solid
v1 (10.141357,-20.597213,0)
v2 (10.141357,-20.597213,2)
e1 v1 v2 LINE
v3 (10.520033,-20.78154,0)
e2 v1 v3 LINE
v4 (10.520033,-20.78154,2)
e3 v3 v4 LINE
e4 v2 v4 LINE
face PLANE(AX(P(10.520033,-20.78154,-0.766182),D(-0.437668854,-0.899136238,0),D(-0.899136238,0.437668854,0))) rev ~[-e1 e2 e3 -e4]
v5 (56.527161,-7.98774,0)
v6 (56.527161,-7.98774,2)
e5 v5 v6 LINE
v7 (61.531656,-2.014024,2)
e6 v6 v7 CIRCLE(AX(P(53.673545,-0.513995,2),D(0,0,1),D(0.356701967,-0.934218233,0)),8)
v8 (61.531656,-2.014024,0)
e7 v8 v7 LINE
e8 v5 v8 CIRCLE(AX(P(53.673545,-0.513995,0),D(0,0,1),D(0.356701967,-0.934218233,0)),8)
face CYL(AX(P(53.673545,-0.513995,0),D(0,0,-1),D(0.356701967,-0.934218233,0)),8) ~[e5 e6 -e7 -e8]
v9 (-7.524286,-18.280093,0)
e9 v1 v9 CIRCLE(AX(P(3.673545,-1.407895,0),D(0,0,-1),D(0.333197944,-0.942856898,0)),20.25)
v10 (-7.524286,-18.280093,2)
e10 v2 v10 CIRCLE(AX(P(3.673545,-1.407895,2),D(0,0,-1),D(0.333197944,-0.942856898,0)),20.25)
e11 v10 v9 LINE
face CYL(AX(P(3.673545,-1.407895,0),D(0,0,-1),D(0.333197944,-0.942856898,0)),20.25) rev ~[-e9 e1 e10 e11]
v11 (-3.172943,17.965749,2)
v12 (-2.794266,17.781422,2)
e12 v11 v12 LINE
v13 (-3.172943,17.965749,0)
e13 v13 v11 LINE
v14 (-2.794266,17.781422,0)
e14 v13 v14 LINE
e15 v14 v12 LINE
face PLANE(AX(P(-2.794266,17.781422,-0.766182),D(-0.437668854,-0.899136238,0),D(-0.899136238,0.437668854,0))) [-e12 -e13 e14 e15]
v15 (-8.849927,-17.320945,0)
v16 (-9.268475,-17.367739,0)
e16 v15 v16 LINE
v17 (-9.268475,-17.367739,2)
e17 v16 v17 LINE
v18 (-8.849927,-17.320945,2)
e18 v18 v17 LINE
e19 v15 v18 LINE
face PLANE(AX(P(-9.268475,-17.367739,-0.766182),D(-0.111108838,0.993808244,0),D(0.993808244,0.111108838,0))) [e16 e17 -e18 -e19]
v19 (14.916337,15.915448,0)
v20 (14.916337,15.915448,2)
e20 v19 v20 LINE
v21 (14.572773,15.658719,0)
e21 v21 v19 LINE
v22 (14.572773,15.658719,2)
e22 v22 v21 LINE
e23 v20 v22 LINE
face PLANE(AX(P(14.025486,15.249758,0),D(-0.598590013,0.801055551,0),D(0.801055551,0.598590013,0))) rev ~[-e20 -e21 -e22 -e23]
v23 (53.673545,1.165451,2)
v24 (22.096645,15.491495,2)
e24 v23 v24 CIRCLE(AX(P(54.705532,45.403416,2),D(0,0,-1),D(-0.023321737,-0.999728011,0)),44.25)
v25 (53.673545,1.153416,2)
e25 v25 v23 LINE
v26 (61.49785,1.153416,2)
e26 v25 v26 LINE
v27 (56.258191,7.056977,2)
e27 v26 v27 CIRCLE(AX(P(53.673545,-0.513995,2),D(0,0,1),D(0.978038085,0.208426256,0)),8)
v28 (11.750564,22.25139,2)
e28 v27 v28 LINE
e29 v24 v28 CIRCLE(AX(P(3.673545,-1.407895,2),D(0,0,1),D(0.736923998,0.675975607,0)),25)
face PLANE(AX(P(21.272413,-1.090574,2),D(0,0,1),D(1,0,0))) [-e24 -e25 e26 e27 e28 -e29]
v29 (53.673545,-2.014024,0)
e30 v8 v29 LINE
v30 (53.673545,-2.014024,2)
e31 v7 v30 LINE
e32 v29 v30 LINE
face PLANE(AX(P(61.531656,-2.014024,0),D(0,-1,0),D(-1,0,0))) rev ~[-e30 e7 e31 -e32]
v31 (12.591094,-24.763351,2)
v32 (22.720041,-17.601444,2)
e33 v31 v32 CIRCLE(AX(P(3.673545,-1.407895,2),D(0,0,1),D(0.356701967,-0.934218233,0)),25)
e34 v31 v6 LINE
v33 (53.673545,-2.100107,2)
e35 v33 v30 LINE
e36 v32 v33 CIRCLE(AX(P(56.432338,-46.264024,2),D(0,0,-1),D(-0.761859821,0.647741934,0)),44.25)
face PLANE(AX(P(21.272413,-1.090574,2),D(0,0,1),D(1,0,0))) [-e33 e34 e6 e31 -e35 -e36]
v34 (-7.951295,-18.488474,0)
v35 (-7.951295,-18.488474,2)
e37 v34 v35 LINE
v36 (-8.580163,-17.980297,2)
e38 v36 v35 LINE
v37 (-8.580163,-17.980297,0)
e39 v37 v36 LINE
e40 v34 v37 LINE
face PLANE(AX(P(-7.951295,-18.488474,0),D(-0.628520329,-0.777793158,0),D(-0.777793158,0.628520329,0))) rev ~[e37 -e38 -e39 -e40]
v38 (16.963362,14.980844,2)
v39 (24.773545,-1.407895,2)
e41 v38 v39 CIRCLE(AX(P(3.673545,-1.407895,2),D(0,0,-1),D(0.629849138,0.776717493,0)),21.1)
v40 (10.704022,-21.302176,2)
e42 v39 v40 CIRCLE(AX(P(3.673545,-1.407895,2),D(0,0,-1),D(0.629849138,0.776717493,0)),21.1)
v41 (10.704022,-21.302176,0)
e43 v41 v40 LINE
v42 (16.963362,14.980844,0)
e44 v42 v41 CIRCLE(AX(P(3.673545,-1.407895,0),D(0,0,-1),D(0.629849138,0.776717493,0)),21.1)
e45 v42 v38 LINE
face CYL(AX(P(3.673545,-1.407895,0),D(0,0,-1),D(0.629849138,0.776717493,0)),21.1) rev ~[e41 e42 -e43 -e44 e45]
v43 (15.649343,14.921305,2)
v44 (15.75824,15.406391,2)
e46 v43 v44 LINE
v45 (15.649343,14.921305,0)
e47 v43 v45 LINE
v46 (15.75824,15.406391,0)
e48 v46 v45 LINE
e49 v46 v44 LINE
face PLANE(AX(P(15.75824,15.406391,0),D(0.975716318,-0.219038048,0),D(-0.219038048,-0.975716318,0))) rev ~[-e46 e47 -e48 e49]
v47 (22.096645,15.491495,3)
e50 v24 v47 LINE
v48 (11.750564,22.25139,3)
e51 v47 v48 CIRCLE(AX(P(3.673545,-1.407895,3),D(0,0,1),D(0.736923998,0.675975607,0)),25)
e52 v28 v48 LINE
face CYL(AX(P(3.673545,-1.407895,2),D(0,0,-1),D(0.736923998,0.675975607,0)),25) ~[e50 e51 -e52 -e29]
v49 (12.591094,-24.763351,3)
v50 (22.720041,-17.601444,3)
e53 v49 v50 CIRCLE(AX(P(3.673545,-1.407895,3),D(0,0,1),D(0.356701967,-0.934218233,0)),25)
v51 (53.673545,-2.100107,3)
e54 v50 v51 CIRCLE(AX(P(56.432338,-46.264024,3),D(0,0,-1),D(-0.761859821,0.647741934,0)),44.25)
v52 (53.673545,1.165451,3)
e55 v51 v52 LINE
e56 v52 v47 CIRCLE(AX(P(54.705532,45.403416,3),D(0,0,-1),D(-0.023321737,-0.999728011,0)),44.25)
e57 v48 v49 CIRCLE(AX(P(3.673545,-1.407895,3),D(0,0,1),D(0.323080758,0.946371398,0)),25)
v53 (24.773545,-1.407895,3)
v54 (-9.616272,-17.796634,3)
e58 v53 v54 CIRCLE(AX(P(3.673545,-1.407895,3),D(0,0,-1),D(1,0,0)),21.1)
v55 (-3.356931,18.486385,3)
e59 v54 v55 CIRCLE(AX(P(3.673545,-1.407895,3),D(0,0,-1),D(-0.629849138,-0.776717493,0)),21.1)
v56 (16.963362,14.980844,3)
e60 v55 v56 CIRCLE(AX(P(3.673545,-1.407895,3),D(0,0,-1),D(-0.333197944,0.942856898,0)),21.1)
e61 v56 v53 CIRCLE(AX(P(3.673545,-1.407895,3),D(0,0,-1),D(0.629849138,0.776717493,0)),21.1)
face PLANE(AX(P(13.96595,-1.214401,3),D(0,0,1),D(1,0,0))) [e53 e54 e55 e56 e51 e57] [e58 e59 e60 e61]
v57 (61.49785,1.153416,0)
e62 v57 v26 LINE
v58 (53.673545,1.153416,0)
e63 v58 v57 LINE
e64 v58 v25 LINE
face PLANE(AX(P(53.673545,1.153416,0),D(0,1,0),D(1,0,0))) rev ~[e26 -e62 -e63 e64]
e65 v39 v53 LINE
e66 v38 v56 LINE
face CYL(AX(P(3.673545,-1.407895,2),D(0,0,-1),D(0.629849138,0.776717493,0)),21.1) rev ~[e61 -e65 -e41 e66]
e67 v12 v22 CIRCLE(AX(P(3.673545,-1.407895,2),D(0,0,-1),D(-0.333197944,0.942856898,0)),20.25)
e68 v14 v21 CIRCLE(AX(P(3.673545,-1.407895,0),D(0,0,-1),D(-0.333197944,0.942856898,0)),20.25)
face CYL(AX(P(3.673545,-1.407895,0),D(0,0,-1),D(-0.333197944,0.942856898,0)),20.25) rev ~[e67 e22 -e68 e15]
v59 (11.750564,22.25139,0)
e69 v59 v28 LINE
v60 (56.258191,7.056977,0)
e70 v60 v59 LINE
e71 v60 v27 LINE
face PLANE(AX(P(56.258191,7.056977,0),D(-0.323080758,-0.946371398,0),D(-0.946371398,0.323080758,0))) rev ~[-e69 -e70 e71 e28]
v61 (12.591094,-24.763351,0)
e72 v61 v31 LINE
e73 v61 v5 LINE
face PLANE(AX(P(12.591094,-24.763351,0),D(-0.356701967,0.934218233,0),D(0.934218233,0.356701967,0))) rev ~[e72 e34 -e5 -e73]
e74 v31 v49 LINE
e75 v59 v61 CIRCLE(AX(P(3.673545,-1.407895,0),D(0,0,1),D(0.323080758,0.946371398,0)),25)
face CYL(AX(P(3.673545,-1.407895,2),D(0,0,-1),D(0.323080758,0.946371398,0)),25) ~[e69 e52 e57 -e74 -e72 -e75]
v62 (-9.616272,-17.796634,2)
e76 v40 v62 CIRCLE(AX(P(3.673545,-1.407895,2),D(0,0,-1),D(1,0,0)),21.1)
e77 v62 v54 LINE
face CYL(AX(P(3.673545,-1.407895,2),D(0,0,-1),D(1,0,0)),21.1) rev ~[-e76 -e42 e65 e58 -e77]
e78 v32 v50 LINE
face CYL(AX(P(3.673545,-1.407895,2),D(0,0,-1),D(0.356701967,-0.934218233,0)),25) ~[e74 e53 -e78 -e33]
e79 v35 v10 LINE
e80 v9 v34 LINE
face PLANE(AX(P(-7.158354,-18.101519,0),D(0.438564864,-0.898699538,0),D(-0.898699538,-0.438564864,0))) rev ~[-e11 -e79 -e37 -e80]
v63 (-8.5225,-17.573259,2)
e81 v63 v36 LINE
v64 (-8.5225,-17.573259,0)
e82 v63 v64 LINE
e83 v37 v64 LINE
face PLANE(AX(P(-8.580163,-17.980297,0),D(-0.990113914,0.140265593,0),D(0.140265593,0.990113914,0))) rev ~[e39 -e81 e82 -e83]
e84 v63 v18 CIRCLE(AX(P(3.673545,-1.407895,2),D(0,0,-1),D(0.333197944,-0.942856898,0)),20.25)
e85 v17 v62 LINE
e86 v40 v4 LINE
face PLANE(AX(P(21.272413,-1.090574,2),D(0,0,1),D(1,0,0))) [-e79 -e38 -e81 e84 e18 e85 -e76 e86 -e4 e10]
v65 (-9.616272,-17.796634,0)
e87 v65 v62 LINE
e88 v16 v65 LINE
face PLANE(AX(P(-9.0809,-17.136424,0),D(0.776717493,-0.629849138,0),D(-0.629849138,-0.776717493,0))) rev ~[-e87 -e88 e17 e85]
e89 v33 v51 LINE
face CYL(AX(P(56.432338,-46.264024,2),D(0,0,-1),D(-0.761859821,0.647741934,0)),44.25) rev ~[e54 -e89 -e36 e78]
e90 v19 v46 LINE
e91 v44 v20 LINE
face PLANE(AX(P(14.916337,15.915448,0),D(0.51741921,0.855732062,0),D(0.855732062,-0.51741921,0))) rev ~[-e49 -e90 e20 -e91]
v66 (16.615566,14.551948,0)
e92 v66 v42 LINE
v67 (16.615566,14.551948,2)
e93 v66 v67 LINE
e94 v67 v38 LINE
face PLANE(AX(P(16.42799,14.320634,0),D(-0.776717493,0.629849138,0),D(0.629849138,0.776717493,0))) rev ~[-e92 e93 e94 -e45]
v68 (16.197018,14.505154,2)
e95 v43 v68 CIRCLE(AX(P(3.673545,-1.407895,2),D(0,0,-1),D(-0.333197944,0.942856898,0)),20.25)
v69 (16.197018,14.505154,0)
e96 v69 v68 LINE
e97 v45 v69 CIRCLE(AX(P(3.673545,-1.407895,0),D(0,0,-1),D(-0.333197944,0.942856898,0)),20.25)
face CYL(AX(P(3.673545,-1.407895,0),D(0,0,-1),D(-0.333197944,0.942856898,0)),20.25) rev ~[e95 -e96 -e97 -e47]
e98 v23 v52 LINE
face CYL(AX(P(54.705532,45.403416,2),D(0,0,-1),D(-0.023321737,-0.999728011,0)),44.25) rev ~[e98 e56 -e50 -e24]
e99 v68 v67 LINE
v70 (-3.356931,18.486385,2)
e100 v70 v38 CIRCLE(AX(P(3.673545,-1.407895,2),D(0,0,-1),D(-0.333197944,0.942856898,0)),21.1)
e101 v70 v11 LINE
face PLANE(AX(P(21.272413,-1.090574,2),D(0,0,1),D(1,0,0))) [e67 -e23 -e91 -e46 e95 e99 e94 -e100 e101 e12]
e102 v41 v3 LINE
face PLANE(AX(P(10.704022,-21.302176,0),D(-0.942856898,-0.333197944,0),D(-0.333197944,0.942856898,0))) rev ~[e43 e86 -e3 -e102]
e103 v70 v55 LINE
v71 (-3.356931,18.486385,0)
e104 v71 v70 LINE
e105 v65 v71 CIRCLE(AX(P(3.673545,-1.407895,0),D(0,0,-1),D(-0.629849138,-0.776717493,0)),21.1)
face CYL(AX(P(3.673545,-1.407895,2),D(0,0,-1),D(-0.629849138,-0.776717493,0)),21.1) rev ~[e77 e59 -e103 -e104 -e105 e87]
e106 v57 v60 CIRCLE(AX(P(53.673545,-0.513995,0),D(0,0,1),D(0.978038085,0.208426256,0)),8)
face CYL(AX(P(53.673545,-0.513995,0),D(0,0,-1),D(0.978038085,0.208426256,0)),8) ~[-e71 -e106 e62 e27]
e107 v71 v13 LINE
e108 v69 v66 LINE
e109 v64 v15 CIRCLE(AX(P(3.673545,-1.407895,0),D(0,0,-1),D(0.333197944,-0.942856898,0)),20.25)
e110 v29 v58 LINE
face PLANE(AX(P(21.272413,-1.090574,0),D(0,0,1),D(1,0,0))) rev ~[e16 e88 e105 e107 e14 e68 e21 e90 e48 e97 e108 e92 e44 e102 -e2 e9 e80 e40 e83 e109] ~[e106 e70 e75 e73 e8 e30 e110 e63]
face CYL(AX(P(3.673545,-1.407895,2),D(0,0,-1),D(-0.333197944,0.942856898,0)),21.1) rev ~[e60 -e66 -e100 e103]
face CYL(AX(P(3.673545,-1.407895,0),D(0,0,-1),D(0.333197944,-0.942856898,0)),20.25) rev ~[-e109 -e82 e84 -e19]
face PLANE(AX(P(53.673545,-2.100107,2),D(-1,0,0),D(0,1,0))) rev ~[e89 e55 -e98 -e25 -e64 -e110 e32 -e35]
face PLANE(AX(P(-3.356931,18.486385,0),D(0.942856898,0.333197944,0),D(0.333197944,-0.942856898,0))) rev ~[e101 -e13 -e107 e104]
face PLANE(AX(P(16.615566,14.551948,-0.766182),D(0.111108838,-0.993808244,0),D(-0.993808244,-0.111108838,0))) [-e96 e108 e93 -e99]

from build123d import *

# Parameters (mm, degrees)
F1_DEPTH    = 2
F3_DEPTH    = 1
F5_DEPTH    = 25
F6_T1_DEPTH = 3.532364341


# Not quite as in the source:
# - a fillet or chamfer that OpenCascade refuses, or shapes differently, is made with other operations: its cross-section is extruded or revolved along the edge and cut away or added


with BuildPart() as f1:
    # F0 (on Top) → F1 (new body)
    with BuildSketch(Plane.XY):
        with BuildLine():
            Line((56.2581913165, 7.0569766727), (11.7505642065, 22.2513897102))
            ThreePointArc((11.7505642065, 22.2513897102), (-21.3224604142, -1.8547742058), (12.5910944331, -24.7633510695))
            Line((12.5910944331, -24.7633510695), (56.5271609891, -7.9877403768))
            ThreePointArc((56.5271609891, -7.9877403768), (59.80596685, -5.6514457625), (61.5316564147, -2.0140241586))
            Line((61.5316564147, -2.0140241586), (53.6735452507, -2.0140241586))
            Line((53.6735452507, -2.0140241586), (53.6735452507, 1.1534155326))
            Line((53.6735452507, 1.1534155326), (61.4978499313, 1.1534155326))
            ThreePointArc((61.4978499313, 1.1534155326), (59.6568196422, 4.7964129612), (56.2581913165, 7.0569766727))
        make_face()
        with BuildLine():
            ThreePointArc((-9.6162715523, -17.7966343508), (-17.1193131366, 2.1791704159), (-3.3569313702, 18.4863852979))
            Line((-3.3569313702, 18.4863852979), (-3.0737131177, 17.6849569346))
            ThreePointArc((-3.0737131177, 17.6849569346), (7.1161082705, 18.5473361415), (16.4279902868, 14.3206339835))
            Line((16.4279902868, 14.3206339835), (16.9633620538, 14.9808438525))
            ThreePointArc((16.9633620538, 14.9808438525), (24.466403638, -4.9949609142), (10.7040218716, -21.3021757961))
            Line((10.7040218716, -21.3021757961), (10.4208036191, -20.5007474329))
            ThreePointArc((10.4208036191, -20.5007474329), (0.2309822309, -21.3631266398), (-9.0808997854, -17.1364244817))
            Line((-9.0808997854, -17.1364244817), (-9.6162715523, -17.7966343508))
        make_face(mode=Mode.SUBTRACT)
    extrude(amount=F1_DEPTH)

    # F2 (on face) → F3 (join)
    with BuildSketch(Plane.XY.offset(2)):
        with BuildLine():
            ThreePointArc((53.6735452507, 1.1654510324), (36.4234102314, 5.106684653), (22.0966452002, 15.4914949248))
            ThreePointArc((22.0966452002, 15.4914949248), (17.3479051946, 19.5208381125), (11.7505642065, 22.2513897102))
            ThreePointArc((11.7505642065, 22.2513897102), (-21.3224604142, -1.8547742058), (12.5910944331, -24.7633510695))
            ThreePointArc((12.5910944331, -24.7633510695), (18.1068462898, -21.8206319867), (22.7200407832, -17.6014435919))
            ThreePointArc((22.7200407832, -17.6014435919), (36.6180007946, -6.6981986771), (53.6735452507, -2.100107176))
            Line((53.6735452507, -2.100107176), (53.6735452507, -2.0140241586))
            Line((53.6735452507, -2.0140241586), (53.6735452507, 1.1534155326))
            Line((53.6735452507, 1.1534155326), (53.6735452507, 1.1654510324))
        make_face()
        with BuildLine():
            ThreePointArc((16.9633620538, 14.9808438525), (22.7211846654, 7.6694079147), (24.7735452507, -1.4078952491))
            ThreePointArc((24.7735452507, -1.4078952491), (20.9007484001, -13.591222859), (10.7040218716, -21.3021757961))
            ThreePointArc((10.7040218716, -21.3021757961), (0.0864795857, -22.2007536364), (-9.6162715523, -17.7966343508))
            ThreePointArc((-9.6162715523, -17.7966343508), (-17.1193131366, 2.1791704159), (-3.3569313702, 18.4863852979))
            ThreePointArc((-3.3569313702, 18.4863852979), (7.2606109157, 19.3849631382), (16.9633620538, 14.9808438525))
        make_face(mode=Mode.SUBTRACT)
    extrude(amount=F3_DEPTH)

    # F4 (on face) → F5 (cut)
    with BuildSketch(Plane(origin=(0, 0, 0), x_dir=(1, 0, 0), z_dir=(0, 0, -1))):
        Polygon((-8.5801632286, 17.98029692), (-8.4723387845, 17.2191802412), (-7.1583543904, 18.1015189737), (-7.951295166, 18.4884736217), align=None)
        Polygon((15.7582396641, -15.4063906521), (15.5428694561, -14.4470129162), (14.0254860744, -15.2497580275), (14.9163370952, -15.9154478461), align=None)
    extrude(amount=-F5_DEPTH, mode=Mode.SUBTRACT)

    # F6: chamfer of 0.3 on 4 edges, made by hand

    # F6_s2 → F6_t1 (cut)
    with BuildSketch(Plane.XY.offset(-0.7661821705)):
        with BuildLine():
            Line((-9.2684752215, -17.3677387978), (-8.8499270506, -17.3209446589))
            ThreePointArc((-8.8499270506, -17.3209446589), (-8.9624343354, -17.2317544465), (-9.0808997854, -17.1364244817))
            Line((-9.0808997854, -17.1364244817), (-9.2684752215, -17.3677387978))
        make_face()
        with BuildLine():
            Line((10.5200333329, -20.7815397421), (10.1413568327, -20.5972129374))
            ThreePointArc((10.1413568327, -20.5972129374), (10.2772447573, -20.5508744537), (10.4208036191, -20.5007474329))
            Line((10.4208036191, -20.5007474329), (10.5200333329, -20.7815397421))
        make_face()
        with BuildLine():
            Line((16.6155657229, 14.5519482995), (16.197017552, 14.5051541606))
            ThreePointArc((16.197017552, 14.5051541606), (16.3095248368, 14.4159639483), (16.4279902868, 14.3206339835))
            Line((16.4279902868, 14.3206339835), (16.6155657229, 14.5519482995))
        make_face()
        with BuildLine():
            Line((-2.7942663313, 17.7814224391), (-3.1729428315, 17.9657492438))
            Line((-3.1729428315, 17.9657492438), (-3.0737131177, 17.6849569346))
            ThreePointArc((-3.0737131177, 17.6849569346), (-2.9301542559, 17.7350839554), (-2.7942663313, 17.7814224391))
        make_face()
    extrude(amount=F6_T1_DEPTH, mode=Mode.SUBTRACT)


solid = f1.part
